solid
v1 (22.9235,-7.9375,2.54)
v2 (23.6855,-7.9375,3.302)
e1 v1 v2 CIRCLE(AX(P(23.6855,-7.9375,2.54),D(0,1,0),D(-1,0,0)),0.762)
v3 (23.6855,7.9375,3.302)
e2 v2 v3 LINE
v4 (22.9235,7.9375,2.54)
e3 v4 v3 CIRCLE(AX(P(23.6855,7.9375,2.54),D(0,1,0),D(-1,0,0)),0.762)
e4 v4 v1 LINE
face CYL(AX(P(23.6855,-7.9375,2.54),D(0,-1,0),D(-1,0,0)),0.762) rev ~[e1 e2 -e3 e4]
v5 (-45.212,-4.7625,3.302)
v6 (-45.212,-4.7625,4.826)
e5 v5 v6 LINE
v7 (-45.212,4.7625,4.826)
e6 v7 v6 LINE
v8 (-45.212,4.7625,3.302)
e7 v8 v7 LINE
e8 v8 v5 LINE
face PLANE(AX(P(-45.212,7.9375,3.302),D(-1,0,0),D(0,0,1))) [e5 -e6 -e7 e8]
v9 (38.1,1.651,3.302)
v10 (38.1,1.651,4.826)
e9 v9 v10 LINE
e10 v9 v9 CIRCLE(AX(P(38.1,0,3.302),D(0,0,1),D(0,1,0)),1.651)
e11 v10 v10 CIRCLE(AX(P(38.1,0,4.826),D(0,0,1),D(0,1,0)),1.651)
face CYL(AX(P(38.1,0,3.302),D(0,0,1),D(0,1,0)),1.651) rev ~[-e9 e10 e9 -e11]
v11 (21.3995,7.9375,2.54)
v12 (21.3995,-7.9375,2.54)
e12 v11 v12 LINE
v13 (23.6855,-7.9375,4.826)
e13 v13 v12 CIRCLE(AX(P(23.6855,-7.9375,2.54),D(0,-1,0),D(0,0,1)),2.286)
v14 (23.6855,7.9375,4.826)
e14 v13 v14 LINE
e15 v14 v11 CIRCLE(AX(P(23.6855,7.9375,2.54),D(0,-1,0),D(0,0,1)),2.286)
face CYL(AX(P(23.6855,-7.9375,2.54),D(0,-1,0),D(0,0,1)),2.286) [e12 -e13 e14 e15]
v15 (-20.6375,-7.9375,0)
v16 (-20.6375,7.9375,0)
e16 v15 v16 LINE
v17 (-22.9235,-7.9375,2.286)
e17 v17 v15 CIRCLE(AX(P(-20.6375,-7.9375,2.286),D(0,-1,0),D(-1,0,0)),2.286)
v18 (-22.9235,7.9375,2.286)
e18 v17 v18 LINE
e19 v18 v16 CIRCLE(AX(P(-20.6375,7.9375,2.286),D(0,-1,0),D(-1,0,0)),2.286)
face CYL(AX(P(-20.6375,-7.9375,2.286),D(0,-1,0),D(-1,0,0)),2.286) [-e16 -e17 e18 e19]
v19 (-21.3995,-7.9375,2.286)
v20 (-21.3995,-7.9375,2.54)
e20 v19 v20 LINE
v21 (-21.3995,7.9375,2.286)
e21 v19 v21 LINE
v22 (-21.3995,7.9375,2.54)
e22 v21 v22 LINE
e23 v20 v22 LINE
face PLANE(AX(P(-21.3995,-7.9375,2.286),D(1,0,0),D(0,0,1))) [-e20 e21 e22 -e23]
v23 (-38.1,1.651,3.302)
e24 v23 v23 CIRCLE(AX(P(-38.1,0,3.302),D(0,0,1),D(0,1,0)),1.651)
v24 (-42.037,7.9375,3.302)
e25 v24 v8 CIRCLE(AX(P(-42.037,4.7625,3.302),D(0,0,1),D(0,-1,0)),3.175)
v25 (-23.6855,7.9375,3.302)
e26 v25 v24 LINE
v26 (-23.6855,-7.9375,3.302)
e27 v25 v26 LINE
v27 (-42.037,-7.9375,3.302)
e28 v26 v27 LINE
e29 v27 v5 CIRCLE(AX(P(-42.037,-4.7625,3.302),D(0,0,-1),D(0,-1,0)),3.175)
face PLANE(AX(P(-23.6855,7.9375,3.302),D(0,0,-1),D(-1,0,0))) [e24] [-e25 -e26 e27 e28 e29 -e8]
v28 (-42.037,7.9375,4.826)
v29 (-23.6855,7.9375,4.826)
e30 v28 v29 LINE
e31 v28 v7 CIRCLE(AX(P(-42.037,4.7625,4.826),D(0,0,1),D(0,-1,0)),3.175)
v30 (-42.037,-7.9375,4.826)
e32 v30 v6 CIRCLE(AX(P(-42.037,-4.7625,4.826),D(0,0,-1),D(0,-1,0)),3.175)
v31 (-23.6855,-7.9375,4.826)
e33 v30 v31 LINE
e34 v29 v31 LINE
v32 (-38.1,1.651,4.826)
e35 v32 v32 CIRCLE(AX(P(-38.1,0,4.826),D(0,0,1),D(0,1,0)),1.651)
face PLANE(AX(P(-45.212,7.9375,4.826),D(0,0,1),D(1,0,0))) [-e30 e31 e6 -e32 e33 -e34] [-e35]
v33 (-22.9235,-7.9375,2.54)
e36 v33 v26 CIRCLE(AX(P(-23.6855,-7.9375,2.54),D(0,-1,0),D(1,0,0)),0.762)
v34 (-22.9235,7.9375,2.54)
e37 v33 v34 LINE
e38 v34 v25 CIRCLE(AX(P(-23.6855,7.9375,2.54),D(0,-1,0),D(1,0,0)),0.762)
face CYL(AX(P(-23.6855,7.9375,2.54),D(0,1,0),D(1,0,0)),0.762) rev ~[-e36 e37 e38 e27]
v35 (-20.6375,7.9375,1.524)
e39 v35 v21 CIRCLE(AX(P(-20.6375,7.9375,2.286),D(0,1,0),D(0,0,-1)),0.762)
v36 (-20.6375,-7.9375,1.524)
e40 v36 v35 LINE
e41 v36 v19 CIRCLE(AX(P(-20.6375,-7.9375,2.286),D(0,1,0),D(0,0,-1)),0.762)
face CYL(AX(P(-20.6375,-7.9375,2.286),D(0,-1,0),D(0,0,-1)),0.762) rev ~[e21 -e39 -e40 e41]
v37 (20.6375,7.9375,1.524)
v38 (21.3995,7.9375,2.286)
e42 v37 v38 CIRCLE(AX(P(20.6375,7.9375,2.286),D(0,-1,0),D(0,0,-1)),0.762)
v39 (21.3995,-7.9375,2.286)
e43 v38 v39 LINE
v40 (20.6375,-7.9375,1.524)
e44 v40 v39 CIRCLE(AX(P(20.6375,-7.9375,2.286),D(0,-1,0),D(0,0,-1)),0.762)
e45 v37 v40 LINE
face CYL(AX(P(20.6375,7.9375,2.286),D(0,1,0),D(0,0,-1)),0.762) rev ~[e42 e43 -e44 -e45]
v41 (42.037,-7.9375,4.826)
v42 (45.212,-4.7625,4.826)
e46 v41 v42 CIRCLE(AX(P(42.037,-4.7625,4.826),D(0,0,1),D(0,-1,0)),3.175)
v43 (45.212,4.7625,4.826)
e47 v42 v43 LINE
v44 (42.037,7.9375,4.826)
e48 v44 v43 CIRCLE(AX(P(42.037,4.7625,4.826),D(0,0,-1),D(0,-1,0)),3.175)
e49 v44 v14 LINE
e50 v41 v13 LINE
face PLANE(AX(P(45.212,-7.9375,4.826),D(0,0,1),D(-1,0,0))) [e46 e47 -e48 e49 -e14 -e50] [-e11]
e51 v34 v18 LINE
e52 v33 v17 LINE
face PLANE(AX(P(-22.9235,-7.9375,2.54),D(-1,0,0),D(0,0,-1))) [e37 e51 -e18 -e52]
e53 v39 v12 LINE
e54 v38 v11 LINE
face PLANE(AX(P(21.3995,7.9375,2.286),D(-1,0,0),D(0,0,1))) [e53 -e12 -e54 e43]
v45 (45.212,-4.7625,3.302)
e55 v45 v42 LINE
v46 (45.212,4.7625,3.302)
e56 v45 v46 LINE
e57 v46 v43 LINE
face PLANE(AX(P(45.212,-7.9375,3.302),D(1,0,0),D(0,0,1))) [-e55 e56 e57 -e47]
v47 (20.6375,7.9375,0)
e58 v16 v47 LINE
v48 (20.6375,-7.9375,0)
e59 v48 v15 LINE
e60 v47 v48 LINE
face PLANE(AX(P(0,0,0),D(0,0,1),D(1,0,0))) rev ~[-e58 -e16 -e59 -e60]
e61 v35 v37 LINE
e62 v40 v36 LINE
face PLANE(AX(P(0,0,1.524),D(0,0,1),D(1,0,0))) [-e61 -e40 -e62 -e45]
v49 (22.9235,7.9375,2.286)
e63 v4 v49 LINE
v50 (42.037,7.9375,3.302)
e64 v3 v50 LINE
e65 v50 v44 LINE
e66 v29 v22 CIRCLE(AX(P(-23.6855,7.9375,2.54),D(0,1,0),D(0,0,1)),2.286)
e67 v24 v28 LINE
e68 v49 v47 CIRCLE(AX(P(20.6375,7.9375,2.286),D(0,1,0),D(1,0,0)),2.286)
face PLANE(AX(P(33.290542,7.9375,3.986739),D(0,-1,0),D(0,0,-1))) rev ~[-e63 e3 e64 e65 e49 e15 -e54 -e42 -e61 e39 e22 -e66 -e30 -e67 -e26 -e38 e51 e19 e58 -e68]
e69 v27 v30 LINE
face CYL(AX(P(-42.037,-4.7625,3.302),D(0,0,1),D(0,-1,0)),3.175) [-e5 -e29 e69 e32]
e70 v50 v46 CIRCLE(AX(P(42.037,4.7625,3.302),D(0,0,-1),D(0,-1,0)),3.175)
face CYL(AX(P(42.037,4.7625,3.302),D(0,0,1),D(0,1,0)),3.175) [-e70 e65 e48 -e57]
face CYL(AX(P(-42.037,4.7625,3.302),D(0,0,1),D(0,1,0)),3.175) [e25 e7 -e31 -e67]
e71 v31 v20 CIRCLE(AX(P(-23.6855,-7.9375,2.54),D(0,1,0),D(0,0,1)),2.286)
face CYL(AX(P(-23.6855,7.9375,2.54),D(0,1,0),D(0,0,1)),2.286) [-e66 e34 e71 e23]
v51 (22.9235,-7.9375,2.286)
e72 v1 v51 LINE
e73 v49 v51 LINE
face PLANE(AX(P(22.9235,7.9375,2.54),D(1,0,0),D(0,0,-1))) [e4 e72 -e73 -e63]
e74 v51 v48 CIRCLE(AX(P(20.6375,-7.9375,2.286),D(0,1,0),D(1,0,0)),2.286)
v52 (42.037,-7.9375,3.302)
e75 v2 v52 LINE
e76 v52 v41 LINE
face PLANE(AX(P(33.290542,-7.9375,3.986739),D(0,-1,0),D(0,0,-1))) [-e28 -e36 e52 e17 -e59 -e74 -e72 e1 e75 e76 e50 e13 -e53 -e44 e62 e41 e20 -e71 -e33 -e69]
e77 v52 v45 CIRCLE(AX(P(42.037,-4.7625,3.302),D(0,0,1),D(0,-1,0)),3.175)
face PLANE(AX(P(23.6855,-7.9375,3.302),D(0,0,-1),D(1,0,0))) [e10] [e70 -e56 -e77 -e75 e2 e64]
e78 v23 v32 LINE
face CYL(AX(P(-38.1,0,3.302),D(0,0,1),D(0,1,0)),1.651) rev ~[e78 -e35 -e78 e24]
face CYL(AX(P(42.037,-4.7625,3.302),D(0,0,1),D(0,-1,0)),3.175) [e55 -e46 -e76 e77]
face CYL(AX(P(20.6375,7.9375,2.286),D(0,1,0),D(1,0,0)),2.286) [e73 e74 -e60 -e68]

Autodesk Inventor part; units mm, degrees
ref_plane "YZ Plane" through (0, 0, 0) normal (1, 0, 0) x (0, 1, 0)
ref_plane "XZ Plane" through (0, 0, 0) normal (0, 1, 0) x (-1, 0, 0)
ref_plane "XY Plane" through (0, 0, 0) normal (0, 0, 1) x (1, 0, 0)
sketch "Sketch1" plane through (0, 0, 0) normal (0, 0, 1) x (1, 0, 0)
  line L0 (-20.6375, 7.9375) -> (20.6375, 7.9375)
  line L1 (20.6375, 7.9375) -> (20.6375, -7.9375)
  line L2 (20.6375, -7.9375) -> (-20.6375, -7.9375)
  line L3 (-20.6375, -7.9375) -> (-20.6375, 7.9375)
  point P0 (0, 0)
  point P1 (0, 7.9375)
  point P2 (-20.6375, 0)
  dimension "d0" = 41.275
  dimension "d1" = 15.875
extrude "Plate1" add sketch "Sketch1" along normal blind 1.524
sketch "Sketch3" plane through (-21.3995, -7.9375, 2.286) normal (-1, 0, 0) x (0, -1, 0)
  line L0 (-15.875, 0) -> (0, 0)
  line L1 (0, 0) -> (0, 0.254)
  line L2 (0, 0.254) -> (-15.875, 0.254)
  line L3 (-15.875, 0.254) -> (-15.875, 0)
edge flange "Flange1" height 2.54 angle 90 thickness 1.524 bend radius 0.762 thickness toward (-1, 0, 0) relief tear relief width 1.524 relief depth 0.762 edges at (-20.6375, 0, 1.524) wall of the first edge with corners at (-21.3995, 7.9375, 2.286) (-21.3995, -7.9375, 2.286) (-21.3995, -7.9375, 2.54) (-21.3995, 7.9375, 2.54)
bend "Bend1"
corner "Corner1"
sketch "Sketch4" plane through (21.3995, 7.9375, 2.286) normal (1, 0, 0) x (0, 1, 0)
  line L0 (-15.875, 0) -> (0, 0)
  line L1 (0, 0) -> (0, 0.254)
  line L2 (0, 0.254) -> (-15.875, 0.254)
  line L3 (-15.875, 0.254) -> (-15.875, 0)
edge flange "Flange2" height 2.54 angle 90 thickness 1.524 bend radius 0.762 thickness toward (1, 0, 0) relief tear relief width 1.524 relief depth 0.762 edges at (20.6375, 0, 1.524) wall of the first edge with corners at (21.3995, -7.9375, 2.286) (21.3995, 7.9375, 2.286) (21.3995, 7.9375, 2.54) (21.3995, -7.9375, 2.54)
bend "Bend2"
corner "Corner2"
sketch "Sketch7" plane through (-23.6855, 7.9375, 3.302) normal (0, 0, 1) x (1, 0, 0)
  line L0 (0, -15.875) -> (0, 0)
  line L1 (0, 0) -> (-21.5265, 0)
  line L2 (-21.5265, 0) -> (-21.5265, -15.875)
  line L3 (-21.5265, -15.875) -> (0, -15.875)
edge flange "Flange5" height 23.8125 angle 90 thickness 1.524 bend radius 0.762 thickness toward (0, 0, 1) relief tear relief width 1.524 relief depth 0.762 edges at (-22.9235, 0, 2.54) wall of the first edge with corners at (-23.6855, -7.9375, 3.302) (-23.6855, 7.9375, 3.302) (-45.212, 7.9375, 3.302) (-45.212, -7.9375, 3.302)
bend "Bend5"
corner "Corner5"
sketch "Sketch8" plane through (23.6855, -7.9375, 3.302) normal (0, 0, 1) x (1, 0, 0)
  line L0 (0, 15.875) -> (0, 0)
  line L1 (0, 0) -> (21.5265, 0)
  line L2 (21.5265, 0) -> (21.5265, 15.875)
  line L3 (21.5265, 15.875) -> (0, 15.875)
edge flange "Flange6" height 23.8125 angle 90 thickness 1.524 bend radius 0.762 thickness toward (0, 0, 1) relief tear relief width 1.524 relief depth 0.762 edges at (21.3995, 0, 2.54) wall of the first edge with corners at (23.6855, 7.9375, 3.302) (23.6855, -7.9375, 3.302) (45.212, -7.9375, 3.302) (45.212, 7.9375, 3.302)
bend "Bend6"
corner "Corner6"
sketch "Sketch9" plane through (-45.212, -7.9375, 3.302) normal (0, 0, -1) x (-1, 0, 0)
  line L0 (0, 0) -> (0, 15.875) projected
  point P0 (-45.212, 7.9375)
  point P1 (-7.112, 7.9375)
  point P2 (-83.312, 7.9375)
  point P3 (0, 7.9375)
  dimension "d65" = 76.2
  dimension "d66" = 7.112
hole "Hole1" at (-38.1, 0, 3.302) at (38.1, 0, 3.302) direction (0, 0, 1) diameter 3.302 depth 1.524 tip angle 118
fillet "Corner Round1" radius 3.175 4 edges at (-45.212, -7.9375, 4.064) (-45.212, 7.9375, 4.064) (45.212, 7.9375, 4.064) (45.212, -7.9375, 4.064)
equation "\"d72\" = Thickness"
equation "\"d2\" = Thickness"
equation "\"d5\" = BendReliefWidth"
equation "\"d6\" = BendReliefDepth"
equation "\"d7\" = MinimumRemnant"
equation "\"d8\" = TransitionRadius"
equation "\"d12\" = CornerReliefSize"
equation "\"d13\" = GapSize"
equation "\"d14\" = JacobiRadiusSize"
equation "\"d15\" = BendReliefWidth"
equation "\"d16\" = BendReliefDepth"
equation "\"d17\" = MinimumRemnant"
equation "\"d18\" = TransitionRadius"
equation "\"d22\" = CornerReliefSize"
equation "\"d23\" = GapSize"
equation "\"d24\" = JacobiRadiusSize"
equation "\"d45\" = BendReliefWidth"
equation "\"d46\" = BendReliefDepth"
equation "\"d47\" = MinimumRemnant"
equation "\"d48\" = TransitionRadius"
equation "\"d52\" = CornerReliefSize"
equation "\"d53\" = GapSize"
equation "\"d54\" = JacobiRadiusSize"
equation "\"d55\" = BendReliefWidth"
equation "\"d56\" = BendReliefDepth"
equation "\"d57\" = MinimumRemnant"
equation "\"d58\" = TransitionRadius"
equation "\"d62\" = CornerReliefSize"
equation "\"d63\" = GapSize"
equation "\"d64\" = JacobiRadiusSize"
equation "\"BendRadius\" = Thickness"
equation "\"BendReliefWidth\" = Thickness"
equation "\"BendReliefDepth\" = 0.5 * Thickness"
equation "\"CornerReliefSize\" = 4 * Thickness"
equation "\"MinimumRemnant\" = 2 * Thickness"
equation "\"TransitionRadius\" = BendRadius"
equation "\"JacobiRadiusSize\" = BendRadius"
equation "\"GapSize\" = Thickness"
equation "\"Thickness\" = 1.524"
properties part number "J010308" material "STAINLESS STEEL, 316"
